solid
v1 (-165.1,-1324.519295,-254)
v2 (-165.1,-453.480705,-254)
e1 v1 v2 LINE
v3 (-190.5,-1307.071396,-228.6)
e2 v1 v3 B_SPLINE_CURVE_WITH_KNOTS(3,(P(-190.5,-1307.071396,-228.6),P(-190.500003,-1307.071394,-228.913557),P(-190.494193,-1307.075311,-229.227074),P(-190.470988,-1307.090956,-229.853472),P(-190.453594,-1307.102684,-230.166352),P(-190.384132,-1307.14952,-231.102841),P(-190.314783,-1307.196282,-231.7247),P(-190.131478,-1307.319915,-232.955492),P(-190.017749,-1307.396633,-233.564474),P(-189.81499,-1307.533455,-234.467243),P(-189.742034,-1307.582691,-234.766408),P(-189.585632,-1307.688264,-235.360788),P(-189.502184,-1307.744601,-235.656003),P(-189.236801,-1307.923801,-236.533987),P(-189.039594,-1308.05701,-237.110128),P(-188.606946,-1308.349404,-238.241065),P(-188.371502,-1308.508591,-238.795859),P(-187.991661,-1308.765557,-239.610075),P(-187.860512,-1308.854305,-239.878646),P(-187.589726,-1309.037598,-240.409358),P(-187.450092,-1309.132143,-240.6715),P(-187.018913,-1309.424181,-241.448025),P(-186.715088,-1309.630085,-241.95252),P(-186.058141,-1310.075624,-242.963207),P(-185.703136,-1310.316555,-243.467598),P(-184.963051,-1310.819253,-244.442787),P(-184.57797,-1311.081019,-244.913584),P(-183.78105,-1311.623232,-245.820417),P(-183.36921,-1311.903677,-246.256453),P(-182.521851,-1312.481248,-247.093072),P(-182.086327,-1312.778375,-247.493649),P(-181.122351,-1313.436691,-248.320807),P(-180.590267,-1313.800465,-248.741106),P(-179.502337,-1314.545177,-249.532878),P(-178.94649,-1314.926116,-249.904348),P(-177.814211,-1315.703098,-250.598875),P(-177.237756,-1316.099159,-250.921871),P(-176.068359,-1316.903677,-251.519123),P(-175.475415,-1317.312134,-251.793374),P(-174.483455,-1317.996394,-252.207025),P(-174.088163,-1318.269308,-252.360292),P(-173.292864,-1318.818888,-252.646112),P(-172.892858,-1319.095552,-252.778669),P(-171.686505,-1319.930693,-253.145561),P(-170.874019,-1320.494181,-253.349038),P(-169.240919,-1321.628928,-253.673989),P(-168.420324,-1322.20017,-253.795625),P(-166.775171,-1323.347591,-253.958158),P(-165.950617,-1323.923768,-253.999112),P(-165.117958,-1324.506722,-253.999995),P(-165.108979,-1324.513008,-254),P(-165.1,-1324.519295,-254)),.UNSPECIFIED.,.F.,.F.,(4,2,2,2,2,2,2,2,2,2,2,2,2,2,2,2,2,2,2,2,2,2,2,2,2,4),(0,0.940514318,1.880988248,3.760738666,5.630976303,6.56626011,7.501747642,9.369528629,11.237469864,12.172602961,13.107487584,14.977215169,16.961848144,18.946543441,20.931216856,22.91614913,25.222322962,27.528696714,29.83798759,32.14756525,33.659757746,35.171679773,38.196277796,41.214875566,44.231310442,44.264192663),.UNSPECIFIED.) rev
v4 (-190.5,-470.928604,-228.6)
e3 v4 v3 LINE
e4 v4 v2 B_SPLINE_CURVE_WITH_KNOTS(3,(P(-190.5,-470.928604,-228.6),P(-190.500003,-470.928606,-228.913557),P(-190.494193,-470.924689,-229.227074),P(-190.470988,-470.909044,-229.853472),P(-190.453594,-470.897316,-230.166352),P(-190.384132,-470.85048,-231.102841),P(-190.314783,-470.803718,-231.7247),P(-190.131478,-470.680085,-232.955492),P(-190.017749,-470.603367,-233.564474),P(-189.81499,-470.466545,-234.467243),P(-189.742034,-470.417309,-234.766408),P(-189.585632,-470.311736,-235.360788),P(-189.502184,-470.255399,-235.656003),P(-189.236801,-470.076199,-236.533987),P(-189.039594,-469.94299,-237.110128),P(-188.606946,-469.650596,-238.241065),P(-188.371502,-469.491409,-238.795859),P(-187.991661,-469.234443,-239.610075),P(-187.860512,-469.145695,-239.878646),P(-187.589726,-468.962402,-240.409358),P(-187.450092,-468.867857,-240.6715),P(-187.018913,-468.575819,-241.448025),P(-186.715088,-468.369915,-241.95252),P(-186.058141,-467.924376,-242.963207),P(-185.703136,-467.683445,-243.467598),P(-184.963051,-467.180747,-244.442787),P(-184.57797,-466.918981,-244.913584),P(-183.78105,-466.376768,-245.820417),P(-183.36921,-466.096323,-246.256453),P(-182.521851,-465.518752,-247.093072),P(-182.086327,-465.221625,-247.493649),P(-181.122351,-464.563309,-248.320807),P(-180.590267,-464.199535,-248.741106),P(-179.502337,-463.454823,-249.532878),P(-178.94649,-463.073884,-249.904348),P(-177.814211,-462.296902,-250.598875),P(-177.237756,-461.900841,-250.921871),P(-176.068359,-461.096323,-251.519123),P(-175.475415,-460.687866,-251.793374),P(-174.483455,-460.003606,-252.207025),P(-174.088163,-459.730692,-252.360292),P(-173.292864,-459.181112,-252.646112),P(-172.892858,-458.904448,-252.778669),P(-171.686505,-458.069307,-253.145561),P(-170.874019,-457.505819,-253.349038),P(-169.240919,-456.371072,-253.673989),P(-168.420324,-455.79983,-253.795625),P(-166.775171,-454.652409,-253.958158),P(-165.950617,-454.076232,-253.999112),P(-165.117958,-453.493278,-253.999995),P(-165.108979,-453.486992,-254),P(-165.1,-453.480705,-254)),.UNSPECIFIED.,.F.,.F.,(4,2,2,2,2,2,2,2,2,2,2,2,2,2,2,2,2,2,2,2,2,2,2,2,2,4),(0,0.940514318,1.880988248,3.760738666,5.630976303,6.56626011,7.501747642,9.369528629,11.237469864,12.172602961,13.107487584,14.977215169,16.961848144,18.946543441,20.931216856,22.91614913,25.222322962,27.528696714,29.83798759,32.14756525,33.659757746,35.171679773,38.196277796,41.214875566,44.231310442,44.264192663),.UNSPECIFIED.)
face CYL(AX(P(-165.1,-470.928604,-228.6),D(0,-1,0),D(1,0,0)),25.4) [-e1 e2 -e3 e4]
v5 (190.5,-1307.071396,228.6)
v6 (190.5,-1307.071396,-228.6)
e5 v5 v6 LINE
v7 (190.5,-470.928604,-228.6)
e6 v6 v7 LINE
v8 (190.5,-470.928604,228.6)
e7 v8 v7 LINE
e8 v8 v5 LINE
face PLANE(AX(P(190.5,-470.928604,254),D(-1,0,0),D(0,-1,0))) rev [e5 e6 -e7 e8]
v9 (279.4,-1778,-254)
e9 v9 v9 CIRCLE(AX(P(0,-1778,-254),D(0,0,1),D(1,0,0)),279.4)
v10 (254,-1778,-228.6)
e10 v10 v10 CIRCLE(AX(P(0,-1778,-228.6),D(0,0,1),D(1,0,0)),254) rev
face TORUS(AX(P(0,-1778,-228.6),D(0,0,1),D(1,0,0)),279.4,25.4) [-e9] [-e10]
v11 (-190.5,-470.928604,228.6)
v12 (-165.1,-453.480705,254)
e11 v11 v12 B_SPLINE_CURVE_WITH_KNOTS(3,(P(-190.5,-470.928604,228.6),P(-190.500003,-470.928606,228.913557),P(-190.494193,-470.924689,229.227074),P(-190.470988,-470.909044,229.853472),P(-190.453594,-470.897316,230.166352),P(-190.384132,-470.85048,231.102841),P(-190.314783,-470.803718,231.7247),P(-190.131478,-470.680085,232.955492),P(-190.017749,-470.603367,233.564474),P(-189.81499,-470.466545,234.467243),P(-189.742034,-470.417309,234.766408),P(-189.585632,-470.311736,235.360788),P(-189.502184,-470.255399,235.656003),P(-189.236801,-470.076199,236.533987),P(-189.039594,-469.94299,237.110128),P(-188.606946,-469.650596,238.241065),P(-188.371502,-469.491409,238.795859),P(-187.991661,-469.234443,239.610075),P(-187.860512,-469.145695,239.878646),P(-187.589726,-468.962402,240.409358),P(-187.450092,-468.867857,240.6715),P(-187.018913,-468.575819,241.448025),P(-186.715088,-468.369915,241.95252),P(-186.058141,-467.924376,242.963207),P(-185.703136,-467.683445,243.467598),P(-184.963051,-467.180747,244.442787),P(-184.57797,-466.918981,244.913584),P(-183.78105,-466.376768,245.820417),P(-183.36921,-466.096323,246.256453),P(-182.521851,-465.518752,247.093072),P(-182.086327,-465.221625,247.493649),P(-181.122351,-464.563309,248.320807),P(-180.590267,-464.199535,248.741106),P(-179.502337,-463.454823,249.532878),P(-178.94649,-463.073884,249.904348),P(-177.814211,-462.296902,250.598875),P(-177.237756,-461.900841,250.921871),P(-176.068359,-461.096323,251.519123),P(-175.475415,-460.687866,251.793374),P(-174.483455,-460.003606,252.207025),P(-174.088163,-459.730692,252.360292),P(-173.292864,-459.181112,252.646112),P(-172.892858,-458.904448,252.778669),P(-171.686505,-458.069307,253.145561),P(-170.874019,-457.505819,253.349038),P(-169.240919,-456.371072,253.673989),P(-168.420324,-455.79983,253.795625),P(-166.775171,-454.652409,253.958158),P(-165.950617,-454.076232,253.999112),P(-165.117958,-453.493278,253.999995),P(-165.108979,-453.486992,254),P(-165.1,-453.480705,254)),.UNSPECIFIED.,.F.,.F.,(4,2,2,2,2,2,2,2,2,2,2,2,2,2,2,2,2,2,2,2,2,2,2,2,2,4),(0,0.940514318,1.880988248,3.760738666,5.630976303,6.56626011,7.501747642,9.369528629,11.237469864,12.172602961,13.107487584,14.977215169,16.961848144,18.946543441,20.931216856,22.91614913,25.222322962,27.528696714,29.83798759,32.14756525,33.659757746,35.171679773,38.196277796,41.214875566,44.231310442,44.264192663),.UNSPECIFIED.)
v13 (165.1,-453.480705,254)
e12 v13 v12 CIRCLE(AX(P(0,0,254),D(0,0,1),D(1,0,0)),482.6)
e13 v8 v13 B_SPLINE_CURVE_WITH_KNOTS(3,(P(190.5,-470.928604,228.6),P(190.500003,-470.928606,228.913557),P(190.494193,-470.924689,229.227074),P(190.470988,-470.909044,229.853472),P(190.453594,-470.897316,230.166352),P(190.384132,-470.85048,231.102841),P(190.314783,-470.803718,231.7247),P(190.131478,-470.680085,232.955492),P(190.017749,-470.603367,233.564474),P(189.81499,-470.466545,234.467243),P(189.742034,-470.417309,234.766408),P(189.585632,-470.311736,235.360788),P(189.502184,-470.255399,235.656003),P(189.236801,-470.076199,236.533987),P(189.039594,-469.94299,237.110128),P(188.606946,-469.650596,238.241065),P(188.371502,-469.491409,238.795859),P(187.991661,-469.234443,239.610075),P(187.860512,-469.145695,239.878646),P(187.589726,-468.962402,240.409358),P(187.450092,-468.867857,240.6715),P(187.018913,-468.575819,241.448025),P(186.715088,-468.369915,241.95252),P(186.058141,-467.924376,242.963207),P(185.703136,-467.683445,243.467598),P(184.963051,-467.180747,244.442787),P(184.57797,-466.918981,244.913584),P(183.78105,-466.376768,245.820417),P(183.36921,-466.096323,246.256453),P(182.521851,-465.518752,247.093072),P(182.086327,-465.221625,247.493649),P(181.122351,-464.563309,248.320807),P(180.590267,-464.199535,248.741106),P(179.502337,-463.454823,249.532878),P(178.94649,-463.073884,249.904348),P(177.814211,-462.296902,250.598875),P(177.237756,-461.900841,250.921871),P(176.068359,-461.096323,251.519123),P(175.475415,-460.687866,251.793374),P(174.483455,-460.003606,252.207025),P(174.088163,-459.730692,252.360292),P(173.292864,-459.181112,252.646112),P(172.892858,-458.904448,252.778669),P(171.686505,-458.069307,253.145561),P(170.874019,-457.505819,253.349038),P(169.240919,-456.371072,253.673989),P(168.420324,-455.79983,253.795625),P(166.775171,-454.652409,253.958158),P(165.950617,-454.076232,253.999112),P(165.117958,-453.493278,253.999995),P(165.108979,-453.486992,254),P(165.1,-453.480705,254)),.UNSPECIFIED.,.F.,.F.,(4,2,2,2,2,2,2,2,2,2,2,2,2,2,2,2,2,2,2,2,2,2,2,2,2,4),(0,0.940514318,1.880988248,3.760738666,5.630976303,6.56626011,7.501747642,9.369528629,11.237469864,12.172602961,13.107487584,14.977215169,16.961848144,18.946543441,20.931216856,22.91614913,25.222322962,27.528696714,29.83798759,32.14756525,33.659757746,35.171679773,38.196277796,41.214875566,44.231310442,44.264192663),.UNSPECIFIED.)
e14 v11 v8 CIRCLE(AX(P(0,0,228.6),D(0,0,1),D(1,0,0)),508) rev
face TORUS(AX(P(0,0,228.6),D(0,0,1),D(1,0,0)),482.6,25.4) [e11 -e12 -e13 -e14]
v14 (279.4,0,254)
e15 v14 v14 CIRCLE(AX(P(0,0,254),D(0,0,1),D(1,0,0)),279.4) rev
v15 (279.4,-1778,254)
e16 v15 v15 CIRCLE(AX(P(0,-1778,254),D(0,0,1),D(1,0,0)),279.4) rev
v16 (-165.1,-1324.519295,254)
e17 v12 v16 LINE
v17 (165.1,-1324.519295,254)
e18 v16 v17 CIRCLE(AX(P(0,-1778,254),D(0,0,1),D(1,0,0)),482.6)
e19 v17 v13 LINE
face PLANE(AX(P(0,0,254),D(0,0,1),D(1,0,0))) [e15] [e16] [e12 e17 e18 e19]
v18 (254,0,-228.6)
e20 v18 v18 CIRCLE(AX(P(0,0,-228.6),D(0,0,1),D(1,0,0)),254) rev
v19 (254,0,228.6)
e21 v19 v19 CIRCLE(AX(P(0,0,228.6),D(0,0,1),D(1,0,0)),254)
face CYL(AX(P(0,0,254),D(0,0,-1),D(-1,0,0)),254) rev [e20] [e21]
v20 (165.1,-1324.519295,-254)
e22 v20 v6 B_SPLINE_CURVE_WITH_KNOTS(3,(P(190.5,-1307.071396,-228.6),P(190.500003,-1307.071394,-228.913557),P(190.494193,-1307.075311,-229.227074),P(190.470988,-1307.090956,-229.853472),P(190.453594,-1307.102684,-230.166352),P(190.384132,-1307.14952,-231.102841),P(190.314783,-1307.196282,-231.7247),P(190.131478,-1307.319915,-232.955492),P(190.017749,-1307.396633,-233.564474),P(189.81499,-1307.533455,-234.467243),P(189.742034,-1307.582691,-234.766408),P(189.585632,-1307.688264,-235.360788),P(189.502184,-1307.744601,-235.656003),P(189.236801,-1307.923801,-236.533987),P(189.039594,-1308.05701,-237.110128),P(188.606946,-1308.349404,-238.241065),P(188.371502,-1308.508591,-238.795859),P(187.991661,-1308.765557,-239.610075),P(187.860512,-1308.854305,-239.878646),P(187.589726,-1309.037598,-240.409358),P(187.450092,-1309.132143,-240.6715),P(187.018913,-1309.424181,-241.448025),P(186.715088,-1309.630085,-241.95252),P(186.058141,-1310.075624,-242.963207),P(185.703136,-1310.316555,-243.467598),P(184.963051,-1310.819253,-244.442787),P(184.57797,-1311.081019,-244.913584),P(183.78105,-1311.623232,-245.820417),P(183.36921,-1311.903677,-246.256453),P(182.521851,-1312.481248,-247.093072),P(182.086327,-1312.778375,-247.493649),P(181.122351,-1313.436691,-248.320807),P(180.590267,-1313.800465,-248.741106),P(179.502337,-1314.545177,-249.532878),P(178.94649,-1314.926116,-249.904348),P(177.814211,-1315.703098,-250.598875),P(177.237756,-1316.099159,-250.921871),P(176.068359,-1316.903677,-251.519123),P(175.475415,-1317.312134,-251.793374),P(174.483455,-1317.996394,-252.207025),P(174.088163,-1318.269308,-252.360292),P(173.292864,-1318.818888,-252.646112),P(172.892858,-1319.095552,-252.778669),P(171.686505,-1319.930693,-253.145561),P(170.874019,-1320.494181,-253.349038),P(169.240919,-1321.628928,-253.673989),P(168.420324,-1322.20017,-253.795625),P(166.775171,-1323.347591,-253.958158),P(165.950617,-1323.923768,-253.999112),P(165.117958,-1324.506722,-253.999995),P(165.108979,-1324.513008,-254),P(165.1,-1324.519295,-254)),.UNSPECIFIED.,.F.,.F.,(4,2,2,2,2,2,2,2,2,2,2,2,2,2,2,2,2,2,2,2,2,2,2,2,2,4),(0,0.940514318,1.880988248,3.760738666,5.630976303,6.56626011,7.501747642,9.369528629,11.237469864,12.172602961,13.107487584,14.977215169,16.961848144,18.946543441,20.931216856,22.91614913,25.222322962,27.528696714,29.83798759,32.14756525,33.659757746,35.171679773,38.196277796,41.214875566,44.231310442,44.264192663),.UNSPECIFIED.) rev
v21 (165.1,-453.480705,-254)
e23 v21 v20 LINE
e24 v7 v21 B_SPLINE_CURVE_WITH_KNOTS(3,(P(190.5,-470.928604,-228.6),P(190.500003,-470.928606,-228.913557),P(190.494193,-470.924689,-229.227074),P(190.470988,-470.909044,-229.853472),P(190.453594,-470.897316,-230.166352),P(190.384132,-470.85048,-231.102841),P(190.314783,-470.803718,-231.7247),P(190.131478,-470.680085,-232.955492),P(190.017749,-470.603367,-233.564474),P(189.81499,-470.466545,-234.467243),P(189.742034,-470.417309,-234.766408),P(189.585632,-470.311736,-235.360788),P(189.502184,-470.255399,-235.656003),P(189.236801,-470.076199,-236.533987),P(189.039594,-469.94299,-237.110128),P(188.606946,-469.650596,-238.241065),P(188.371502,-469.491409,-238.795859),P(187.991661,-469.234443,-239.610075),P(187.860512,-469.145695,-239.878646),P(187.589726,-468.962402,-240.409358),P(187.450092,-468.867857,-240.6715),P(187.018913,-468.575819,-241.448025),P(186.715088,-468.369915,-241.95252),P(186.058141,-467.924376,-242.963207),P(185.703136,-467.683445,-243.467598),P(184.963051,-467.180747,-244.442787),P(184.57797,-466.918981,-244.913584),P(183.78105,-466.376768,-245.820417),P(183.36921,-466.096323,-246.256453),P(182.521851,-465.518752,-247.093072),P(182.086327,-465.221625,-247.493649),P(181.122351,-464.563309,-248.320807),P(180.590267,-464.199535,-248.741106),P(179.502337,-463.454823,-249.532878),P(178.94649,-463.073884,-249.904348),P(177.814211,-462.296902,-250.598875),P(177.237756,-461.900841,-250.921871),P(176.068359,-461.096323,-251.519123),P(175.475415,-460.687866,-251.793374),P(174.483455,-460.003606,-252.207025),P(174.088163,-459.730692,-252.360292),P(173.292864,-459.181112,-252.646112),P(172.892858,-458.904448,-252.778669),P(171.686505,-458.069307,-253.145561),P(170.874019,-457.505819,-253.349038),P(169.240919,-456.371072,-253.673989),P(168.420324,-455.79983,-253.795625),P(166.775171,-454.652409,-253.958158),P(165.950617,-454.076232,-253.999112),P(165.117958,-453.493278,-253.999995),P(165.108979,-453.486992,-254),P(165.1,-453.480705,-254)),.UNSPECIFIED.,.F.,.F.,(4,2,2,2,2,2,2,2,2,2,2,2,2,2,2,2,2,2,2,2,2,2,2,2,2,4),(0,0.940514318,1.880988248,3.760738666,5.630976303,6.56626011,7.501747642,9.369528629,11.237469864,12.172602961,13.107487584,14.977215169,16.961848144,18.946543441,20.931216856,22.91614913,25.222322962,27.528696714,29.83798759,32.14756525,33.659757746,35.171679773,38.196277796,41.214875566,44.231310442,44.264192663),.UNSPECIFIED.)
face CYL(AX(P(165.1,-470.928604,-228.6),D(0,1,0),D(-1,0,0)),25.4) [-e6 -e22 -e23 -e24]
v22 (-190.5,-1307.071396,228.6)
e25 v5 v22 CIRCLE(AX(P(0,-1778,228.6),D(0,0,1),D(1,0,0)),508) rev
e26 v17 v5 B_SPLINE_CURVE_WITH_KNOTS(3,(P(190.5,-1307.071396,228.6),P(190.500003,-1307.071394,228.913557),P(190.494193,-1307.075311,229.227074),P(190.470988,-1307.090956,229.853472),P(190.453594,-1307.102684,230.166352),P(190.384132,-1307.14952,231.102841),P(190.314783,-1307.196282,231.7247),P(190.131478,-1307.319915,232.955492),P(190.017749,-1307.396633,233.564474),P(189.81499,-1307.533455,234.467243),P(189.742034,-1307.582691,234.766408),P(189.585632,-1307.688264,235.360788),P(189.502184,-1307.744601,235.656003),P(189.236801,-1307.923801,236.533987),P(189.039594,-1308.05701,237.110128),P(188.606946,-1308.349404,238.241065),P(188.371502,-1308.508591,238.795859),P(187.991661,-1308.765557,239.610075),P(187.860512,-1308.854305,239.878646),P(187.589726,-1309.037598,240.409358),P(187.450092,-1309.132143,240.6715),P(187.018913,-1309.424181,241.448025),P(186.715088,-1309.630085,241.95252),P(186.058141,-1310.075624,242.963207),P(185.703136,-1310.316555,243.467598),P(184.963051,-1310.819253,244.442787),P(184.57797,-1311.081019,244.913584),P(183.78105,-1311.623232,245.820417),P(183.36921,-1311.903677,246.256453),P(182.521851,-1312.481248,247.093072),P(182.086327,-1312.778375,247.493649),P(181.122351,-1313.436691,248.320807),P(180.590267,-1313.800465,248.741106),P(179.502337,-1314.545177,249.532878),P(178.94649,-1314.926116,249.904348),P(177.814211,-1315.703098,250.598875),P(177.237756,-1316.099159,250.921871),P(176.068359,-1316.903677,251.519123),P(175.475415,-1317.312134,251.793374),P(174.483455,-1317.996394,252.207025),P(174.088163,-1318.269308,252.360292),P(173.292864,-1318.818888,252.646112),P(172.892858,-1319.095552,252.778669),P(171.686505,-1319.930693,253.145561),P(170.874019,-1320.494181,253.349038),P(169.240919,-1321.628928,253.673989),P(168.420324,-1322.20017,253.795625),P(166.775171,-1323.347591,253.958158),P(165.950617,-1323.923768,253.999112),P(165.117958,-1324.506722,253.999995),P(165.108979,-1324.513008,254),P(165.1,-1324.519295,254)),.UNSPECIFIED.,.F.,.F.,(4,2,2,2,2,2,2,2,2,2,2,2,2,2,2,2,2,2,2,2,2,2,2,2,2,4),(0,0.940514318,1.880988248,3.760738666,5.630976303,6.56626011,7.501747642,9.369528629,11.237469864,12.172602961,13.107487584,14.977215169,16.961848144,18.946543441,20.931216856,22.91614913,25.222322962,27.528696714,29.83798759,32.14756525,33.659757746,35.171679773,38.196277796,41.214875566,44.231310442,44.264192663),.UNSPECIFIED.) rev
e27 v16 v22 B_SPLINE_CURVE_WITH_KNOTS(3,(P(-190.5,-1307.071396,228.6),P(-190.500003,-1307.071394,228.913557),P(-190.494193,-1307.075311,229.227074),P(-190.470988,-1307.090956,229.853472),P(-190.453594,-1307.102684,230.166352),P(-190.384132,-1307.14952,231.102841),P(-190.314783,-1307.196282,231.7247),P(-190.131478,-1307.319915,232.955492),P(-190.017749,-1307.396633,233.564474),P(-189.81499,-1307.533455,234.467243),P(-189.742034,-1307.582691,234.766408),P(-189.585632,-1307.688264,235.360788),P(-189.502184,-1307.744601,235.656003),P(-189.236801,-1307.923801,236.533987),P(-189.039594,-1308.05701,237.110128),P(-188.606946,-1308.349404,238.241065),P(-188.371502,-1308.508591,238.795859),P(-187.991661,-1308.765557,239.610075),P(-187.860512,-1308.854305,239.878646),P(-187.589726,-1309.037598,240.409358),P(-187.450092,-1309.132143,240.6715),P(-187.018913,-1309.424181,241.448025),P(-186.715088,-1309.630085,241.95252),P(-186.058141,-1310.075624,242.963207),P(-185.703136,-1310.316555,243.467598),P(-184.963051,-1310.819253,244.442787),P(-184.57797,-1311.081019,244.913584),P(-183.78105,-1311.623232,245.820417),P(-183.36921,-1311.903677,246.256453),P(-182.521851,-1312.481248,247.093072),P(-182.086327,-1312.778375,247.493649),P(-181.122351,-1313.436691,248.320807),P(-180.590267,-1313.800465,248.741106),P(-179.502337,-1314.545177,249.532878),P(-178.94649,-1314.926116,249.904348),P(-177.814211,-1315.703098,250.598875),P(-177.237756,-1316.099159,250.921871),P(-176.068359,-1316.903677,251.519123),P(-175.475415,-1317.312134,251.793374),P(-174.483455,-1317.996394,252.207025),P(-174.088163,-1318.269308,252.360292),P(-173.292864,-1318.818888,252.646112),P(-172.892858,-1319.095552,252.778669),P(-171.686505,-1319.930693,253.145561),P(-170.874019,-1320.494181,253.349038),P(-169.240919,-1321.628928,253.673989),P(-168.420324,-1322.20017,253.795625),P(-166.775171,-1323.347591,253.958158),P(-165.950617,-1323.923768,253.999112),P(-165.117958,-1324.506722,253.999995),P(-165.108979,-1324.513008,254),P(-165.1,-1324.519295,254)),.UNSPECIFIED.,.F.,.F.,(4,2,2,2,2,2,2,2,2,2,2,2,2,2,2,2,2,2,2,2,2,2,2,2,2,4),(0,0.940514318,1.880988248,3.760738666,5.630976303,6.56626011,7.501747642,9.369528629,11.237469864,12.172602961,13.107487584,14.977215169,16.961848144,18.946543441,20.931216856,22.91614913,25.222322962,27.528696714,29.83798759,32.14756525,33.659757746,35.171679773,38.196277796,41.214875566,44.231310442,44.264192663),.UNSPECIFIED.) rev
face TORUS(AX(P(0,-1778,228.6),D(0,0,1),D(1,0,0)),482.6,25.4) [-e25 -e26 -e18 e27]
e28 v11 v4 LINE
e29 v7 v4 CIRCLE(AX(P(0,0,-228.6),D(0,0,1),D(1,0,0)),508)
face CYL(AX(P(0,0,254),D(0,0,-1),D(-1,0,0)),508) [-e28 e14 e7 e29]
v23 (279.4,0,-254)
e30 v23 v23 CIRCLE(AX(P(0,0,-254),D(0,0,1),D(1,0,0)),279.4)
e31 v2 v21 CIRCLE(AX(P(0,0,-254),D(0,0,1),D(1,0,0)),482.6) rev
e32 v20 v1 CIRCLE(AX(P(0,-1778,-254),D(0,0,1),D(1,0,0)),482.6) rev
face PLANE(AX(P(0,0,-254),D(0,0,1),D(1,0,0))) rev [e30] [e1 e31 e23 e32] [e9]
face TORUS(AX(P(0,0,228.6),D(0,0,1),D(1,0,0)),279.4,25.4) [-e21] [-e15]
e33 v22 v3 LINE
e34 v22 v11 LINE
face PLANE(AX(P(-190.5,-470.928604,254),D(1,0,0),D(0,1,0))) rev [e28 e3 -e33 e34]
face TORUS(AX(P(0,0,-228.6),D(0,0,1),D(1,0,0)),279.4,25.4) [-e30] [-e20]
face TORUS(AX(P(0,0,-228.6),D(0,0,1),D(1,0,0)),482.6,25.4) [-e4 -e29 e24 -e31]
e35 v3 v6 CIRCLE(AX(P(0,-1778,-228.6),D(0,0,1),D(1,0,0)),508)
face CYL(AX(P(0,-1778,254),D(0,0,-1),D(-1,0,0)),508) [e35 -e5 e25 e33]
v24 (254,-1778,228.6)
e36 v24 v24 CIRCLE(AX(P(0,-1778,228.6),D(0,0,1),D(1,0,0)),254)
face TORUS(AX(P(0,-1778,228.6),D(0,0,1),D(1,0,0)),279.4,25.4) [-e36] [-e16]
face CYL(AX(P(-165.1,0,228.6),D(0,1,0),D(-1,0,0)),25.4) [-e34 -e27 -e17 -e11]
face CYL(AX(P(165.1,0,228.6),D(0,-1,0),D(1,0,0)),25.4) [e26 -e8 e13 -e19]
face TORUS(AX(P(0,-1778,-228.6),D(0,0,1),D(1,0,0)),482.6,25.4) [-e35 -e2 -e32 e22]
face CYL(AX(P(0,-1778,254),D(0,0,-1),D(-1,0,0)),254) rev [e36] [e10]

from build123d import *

# Parameters (mm, degrees)
SKETCH1_R           = 254
BOSS_EXTRUDE1_DEPTH = 254
FILLET1_R           = 25.4


with BuildPart() as part:
    # Sketch1 → Boss-Extrude1 (new, symmetric)
    with BuildSketch(Plane.XY):
        with BuildLine():
            Line((190.5, -470.928603931), (190.5, -1307.071396069))
            ThreePointArc((190.5, -1307.071396069), (0, -2286), (-190.5, -1307.071396069))
            Line((-190.5, -1307.071396069), (-190.5, -470.928603931))
            ThreePointArc((-190.5, -470.928603931), (0, 508), (190.5, -470.928603931))
        make_face()
        Circle(SKETCH1_R, mode=Mode.SUBTRACT)
        with Locations(Location((0, -1778, 0), (0, 0, 180))):
            Circle(SKETCH1_R, mode=Mode.SUBTRACT)
    extrude(amount=BOSS_EXTRUDE1_DEPTH, both=True)

    # Fillet1
    fillet1_edges = [part.edges().sort_by_distance(p)[0] for p in [
        (0, -2286, 254),
        (-254, 0, -254),
        (-254, 0, 254),
        (190.5, -889, 254),
        (254, -1778, -254),
        (254, -1778, 254),
        (0, 508, 254),
        (190.5, -889, -254),
        (0, -2286, -254),
        (-190.5, -889, -254),
        (0, 508, -254),
        (-190.5, -889, 254),
    ]]
    fillet(fillet1_edges, radius=FILLET1_R - 0.0001)  # a hair under: the kernel refuses the full size


solid = part.part
